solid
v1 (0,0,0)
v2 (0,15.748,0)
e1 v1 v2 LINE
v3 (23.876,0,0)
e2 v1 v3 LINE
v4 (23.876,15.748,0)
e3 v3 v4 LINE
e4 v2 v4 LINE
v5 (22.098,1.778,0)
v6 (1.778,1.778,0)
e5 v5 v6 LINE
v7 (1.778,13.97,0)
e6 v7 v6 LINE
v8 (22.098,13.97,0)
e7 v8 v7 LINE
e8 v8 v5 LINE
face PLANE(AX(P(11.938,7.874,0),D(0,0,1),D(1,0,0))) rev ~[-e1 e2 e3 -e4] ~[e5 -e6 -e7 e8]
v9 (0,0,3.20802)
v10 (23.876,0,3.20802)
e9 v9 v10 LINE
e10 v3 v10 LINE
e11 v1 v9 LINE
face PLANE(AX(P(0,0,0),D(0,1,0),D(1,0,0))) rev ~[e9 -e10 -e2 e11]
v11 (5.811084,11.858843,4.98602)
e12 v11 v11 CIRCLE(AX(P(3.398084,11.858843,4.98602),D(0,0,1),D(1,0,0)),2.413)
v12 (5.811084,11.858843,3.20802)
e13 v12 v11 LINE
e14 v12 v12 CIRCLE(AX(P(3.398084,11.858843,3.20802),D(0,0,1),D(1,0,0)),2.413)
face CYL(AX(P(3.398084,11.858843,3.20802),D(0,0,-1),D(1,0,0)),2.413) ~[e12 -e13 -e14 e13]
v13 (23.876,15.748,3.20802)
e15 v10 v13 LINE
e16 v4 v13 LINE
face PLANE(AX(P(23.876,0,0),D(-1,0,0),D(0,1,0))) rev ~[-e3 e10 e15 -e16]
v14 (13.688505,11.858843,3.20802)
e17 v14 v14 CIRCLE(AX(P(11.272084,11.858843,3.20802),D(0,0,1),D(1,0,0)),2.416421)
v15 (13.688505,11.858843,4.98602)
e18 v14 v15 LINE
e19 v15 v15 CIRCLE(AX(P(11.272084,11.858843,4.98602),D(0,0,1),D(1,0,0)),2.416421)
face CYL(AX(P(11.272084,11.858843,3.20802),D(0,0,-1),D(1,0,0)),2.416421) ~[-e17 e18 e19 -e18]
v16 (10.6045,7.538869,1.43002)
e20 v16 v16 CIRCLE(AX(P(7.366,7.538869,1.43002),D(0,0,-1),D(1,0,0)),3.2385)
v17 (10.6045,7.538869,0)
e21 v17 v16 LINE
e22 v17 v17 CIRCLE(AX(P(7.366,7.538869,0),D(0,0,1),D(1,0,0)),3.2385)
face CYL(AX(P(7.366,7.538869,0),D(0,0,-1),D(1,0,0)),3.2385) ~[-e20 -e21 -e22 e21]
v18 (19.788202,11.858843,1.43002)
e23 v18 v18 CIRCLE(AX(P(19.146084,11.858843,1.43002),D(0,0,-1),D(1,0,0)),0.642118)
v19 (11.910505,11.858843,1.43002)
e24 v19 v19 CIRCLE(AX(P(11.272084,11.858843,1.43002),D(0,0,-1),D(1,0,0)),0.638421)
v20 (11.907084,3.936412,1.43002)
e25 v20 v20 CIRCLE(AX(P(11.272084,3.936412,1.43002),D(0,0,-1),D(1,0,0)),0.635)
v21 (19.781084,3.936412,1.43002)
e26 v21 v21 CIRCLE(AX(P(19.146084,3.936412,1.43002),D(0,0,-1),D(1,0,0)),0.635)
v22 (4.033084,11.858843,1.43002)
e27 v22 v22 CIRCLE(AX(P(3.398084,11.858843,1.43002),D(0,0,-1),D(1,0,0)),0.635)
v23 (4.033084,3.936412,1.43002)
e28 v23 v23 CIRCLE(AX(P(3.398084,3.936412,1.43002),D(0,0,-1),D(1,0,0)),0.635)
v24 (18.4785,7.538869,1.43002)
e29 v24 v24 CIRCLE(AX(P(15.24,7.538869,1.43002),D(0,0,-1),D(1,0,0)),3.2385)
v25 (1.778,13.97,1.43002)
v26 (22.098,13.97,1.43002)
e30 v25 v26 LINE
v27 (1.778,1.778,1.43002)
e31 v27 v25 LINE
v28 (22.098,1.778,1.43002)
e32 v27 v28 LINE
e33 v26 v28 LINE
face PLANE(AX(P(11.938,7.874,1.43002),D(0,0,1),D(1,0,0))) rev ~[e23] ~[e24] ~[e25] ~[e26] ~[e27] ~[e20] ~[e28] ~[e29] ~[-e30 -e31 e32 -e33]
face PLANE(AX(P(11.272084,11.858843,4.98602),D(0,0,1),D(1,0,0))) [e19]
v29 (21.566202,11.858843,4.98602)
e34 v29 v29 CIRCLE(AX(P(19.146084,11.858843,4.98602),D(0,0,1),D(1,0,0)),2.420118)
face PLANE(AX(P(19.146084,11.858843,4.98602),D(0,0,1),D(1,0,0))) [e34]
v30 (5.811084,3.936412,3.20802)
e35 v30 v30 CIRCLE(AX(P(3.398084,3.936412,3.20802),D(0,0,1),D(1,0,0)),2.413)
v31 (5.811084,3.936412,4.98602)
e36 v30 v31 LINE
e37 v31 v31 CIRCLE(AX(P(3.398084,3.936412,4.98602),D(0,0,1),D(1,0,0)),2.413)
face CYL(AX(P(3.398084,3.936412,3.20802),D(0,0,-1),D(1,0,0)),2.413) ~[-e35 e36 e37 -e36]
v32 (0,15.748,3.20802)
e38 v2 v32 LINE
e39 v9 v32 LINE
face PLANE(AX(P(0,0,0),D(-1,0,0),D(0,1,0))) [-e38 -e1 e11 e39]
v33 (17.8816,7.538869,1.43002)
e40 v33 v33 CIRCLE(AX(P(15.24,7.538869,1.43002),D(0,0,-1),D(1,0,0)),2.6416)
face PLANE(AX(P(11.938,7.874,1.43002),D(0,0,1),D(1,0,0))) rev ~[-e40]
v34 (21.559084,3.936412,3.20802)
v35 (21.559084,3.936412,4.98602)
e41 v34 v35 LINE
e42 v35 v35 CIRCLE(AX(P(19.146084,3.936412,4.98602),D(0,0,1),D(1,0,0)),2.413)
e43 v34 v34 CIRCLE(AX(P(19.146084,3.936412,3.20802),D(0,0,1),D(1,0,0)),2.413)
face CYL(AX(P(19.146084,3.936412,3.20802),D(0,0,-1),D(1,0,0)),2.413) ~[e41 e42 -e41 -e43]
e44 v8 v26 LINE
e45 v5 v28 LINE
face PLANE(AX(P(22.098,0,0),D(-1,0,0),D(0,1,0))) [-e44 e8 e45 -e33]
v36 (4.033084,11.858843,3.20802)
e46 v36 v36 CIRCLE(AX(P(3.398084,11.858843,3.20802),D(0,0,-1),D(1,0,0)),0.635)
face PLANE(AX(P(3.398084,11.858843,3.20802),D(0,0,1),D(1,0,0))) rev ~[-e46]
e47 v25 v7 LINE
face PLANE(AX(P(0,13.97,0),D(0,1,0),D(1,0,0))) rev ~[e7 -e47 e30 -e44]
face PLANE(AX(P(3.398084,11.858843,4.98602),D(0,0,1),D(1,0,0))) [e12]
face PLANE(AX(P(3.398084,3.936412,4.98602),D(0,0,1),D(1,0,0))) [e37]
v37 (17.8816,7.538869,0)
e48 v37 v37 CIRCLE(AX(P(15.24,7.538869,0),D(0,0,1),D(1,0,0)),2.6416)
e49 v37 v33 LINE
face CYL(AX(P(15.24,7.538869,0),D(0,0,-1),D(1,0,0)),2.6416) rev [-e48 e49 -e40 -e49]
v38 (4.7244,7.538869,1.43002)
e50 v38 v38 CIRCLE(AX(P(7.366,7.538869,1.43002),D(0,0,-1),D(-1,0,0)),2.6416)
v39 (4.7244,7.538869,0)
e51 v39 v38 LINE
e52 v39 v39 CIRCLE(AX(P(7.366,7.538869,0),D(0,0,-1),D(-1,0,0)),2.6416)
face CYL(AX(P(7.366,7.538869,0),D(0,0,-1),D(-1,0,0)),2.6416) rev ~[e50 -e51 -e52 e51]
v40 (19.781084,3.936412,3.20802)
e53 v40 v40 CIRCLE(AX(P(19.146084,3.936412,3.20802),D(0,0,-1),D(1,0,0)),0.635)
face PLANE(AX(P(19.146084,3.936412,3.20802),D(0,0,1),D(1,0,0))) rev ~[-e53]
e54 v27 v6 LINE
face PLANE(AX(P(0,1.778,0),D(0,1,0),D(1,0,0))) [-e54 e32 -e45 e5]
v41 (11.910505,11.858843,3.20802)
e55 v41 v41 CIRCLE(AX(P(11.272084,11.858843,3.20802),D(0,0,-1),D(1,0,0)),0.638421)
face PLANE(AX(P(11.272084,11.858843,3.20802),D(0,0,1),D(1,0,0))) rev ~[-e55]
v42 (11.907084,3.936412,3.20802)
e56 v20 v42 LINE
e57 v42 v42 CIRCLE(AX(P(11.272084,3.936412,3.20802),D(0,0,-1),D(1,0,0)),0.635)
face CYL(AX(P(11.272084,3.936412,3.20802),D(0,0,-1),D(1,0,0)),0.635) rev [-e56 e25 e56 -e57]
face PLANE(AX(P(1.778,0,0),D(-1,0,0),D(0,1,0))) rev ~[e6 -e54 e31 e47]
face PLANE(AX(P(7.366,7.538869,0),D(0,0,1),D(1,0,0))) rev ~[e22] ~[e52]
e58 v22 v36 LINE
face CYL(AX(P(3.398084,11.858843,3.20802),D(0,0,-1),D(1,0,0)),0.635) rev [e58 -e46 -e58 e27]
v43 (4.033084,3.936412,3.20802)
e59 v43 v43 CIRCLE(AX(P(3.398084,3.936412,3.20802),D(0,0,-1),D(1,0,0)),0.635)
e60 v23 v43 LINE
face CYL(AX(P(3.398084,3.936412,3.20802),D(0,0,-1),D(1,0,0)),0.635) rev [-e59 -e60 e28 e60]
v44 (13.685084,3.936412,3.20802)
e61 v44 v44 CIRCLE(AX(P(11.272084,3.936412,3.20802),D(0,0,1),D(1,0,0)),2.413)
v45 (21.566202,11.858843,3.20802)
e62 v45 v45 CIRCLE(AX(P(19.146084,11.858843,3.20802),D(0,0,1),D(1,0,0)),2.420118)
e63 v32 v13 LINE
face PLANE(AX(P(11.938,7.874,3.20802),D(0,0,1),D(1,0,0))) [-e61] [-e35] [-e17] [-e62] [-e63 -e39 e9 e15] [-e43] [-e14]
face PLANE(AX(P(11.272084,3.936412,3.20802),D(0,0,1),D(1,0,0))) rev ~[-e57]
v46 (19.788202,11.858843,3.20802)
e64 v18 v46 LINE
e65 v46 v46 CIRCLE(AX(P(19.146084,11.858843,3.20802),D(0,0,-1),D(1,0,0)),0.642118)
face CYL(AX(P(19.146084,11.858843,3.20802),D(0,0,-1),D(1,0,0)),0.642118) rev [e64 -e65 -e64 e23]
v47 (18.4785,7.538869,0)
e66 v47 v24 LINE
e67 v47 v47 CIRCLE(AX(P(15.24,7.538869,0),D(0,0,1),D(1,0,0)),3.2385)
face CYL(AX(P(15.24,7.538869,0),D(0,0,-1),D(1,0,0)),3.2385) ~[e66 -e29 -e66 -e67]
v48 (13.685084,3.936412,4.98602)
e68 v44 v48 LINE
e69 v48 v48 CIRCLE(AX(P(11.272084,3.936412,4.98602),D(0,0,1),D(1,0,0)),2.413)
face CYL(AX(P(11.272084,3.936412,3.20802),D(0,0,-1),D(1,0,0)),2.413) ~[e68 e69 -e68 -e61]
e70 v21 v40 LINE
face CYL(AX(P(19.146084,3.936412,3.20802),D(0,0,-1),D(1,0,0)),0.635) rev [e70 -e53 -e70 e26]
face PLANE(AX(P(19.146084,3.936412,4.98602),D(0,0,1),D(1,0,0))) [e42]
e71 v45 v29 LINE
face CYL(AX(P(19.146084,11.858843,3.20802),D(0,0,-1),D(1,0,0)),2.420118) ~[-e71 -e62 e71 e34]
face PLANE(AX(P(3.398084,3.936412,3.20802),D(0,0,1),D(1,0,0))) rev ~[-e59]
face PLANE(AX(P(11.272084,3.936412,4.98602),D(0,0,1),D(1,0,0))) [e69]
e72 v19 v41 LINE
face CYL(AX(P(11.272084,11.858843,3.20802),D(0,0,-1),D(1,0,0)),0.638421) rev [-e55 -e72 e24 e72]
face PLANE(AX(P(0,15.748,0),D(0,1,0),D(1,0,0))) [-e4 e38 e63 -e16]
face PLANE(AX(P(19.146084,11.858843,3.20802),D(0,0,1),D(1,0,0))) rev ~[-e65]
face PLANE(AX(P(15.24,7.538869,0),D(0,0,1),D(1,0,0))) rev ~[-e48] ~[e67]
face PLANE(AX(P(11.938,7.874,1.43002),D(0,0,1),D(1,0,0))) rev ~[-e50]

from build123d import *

# Parameters (mm, degrees)
F0_W      = 23.876
F0_H      = 15.748
F1_DEPTH  = 3.20802
F2_R      = 2.413
F3_DEPTH  = 1.778
F2_R_2    = 2.4164208991
F4_DEPTH  = 1.778
F2_R_3    = 2.4201182345
F5_DEPTH  = 1.778
F6_DEPTH  = 1.778
F7_DEPTH  = 1.778
F8_DEPTH  = 1.778
F9_T      = -1.778
F10_R     = 3.2385
F10_R_2   = 2.6416
F11_DEPTH = 3.06898


# Not quite as in the source:
# - a feature names something its author has since deleted; it is built from what else it names


with BuildPart() as f1:
    # F0 (on Top) → F1 (new body)
    with BuildSketch(Plane.XY):
        with Locations((11.938, 7.874)):
            Rectangle(F0_W, F0_H)
    extrude(amount=F1_DEPTH)

    # F2 (on face) → F3 (join)
    with BuildSketch(Plane.XY.offset(3.20802)):
        with Locations((3.3980837251, 11.858843371)):
            Circle(F2_R)
    extrude(amount=F3_DEPTH)

    # F2 (on face) → F4 (join)
    with BuildSketch(Plane.XY.offset(3.20802)):
        with Locations((11.2720837251, 11.858843371)):
            Circle(F2_R_2)
    extrude(amount=F4_DEPTH)

    # F2 (on face) → F5 (join)
    with BuildSketch(Plane.XY.offset(3.20802)):
        with Locations((19.1460837251, 11.858843371)):
            Circle(F2_R_3)
    extrude(amount=F5_DEPTH)

    # F2 (on face) → F6 (join)
    with BuildSketch(Plane.XY.offset(3.20802)):
        with Locations((3.3980837251, 3.9364123053)):
            Circle(F2_R)
    extrude(amount=F6_DEPTH)

    # F2 (on face) → F7 (join)
    with BuildSketch(Plane.XY.offset(3.20802)):
        with Locations((11.2720837251, 3.9364123053)):
            Circle(F2_R)
    extrude(amount=F7_DEPTH)

    # F2 (on face) → F8 (join)
    with BuildSketch(Plane.XY.offset(3.20802)):
        with Locations((19.1460837251, 3.9364123053)):
            Circle(F2_R)
    extrude(amount=F8_DEPTH)

    # F9
    f9_openings = [f1.faces().sort_by_distance(p)[0] for p in [
        (11.938, 7.874, 0),
    ]]
    offset(amount=F9_T, openings=f9_openings, kind=Kind.INTERSECTION)

    # F10 (on face) → F11 (join)
    with BuildSketch(Plane.XY):
        with BuildLine():
            ThreePointArc((4.1275, 7.5388690457), (7.366, 4.3003690457), (10.6045, 7.5388690457))
            ThreePointArc((10.6045, 7.5388690457), (7.366, 10.7773690457), (4.1275, 7.5388690457))
        make_face()
        with BuildLine():
            ThreePointArc((10.0076, 7.5388690457), (7.366, 4.8972690457), (4.7244, 7.5388690457))
            ThreePointArc((4.7244, 7.5388690457), (7.366, 10.1804690457), (10.0076, 7.5388690457))
        make_face(mode=Mode.SUBTRACT)
        with Locations((15.24, 7.5388690457)):
            Circle(F10_R)
        with Locations((15.24, 7.5388690457)):
            Circle(F10_R_2, mode=Mode.SUBTRACT)
    extrude(amount=F11_DEPTH)


solid = f1.part
